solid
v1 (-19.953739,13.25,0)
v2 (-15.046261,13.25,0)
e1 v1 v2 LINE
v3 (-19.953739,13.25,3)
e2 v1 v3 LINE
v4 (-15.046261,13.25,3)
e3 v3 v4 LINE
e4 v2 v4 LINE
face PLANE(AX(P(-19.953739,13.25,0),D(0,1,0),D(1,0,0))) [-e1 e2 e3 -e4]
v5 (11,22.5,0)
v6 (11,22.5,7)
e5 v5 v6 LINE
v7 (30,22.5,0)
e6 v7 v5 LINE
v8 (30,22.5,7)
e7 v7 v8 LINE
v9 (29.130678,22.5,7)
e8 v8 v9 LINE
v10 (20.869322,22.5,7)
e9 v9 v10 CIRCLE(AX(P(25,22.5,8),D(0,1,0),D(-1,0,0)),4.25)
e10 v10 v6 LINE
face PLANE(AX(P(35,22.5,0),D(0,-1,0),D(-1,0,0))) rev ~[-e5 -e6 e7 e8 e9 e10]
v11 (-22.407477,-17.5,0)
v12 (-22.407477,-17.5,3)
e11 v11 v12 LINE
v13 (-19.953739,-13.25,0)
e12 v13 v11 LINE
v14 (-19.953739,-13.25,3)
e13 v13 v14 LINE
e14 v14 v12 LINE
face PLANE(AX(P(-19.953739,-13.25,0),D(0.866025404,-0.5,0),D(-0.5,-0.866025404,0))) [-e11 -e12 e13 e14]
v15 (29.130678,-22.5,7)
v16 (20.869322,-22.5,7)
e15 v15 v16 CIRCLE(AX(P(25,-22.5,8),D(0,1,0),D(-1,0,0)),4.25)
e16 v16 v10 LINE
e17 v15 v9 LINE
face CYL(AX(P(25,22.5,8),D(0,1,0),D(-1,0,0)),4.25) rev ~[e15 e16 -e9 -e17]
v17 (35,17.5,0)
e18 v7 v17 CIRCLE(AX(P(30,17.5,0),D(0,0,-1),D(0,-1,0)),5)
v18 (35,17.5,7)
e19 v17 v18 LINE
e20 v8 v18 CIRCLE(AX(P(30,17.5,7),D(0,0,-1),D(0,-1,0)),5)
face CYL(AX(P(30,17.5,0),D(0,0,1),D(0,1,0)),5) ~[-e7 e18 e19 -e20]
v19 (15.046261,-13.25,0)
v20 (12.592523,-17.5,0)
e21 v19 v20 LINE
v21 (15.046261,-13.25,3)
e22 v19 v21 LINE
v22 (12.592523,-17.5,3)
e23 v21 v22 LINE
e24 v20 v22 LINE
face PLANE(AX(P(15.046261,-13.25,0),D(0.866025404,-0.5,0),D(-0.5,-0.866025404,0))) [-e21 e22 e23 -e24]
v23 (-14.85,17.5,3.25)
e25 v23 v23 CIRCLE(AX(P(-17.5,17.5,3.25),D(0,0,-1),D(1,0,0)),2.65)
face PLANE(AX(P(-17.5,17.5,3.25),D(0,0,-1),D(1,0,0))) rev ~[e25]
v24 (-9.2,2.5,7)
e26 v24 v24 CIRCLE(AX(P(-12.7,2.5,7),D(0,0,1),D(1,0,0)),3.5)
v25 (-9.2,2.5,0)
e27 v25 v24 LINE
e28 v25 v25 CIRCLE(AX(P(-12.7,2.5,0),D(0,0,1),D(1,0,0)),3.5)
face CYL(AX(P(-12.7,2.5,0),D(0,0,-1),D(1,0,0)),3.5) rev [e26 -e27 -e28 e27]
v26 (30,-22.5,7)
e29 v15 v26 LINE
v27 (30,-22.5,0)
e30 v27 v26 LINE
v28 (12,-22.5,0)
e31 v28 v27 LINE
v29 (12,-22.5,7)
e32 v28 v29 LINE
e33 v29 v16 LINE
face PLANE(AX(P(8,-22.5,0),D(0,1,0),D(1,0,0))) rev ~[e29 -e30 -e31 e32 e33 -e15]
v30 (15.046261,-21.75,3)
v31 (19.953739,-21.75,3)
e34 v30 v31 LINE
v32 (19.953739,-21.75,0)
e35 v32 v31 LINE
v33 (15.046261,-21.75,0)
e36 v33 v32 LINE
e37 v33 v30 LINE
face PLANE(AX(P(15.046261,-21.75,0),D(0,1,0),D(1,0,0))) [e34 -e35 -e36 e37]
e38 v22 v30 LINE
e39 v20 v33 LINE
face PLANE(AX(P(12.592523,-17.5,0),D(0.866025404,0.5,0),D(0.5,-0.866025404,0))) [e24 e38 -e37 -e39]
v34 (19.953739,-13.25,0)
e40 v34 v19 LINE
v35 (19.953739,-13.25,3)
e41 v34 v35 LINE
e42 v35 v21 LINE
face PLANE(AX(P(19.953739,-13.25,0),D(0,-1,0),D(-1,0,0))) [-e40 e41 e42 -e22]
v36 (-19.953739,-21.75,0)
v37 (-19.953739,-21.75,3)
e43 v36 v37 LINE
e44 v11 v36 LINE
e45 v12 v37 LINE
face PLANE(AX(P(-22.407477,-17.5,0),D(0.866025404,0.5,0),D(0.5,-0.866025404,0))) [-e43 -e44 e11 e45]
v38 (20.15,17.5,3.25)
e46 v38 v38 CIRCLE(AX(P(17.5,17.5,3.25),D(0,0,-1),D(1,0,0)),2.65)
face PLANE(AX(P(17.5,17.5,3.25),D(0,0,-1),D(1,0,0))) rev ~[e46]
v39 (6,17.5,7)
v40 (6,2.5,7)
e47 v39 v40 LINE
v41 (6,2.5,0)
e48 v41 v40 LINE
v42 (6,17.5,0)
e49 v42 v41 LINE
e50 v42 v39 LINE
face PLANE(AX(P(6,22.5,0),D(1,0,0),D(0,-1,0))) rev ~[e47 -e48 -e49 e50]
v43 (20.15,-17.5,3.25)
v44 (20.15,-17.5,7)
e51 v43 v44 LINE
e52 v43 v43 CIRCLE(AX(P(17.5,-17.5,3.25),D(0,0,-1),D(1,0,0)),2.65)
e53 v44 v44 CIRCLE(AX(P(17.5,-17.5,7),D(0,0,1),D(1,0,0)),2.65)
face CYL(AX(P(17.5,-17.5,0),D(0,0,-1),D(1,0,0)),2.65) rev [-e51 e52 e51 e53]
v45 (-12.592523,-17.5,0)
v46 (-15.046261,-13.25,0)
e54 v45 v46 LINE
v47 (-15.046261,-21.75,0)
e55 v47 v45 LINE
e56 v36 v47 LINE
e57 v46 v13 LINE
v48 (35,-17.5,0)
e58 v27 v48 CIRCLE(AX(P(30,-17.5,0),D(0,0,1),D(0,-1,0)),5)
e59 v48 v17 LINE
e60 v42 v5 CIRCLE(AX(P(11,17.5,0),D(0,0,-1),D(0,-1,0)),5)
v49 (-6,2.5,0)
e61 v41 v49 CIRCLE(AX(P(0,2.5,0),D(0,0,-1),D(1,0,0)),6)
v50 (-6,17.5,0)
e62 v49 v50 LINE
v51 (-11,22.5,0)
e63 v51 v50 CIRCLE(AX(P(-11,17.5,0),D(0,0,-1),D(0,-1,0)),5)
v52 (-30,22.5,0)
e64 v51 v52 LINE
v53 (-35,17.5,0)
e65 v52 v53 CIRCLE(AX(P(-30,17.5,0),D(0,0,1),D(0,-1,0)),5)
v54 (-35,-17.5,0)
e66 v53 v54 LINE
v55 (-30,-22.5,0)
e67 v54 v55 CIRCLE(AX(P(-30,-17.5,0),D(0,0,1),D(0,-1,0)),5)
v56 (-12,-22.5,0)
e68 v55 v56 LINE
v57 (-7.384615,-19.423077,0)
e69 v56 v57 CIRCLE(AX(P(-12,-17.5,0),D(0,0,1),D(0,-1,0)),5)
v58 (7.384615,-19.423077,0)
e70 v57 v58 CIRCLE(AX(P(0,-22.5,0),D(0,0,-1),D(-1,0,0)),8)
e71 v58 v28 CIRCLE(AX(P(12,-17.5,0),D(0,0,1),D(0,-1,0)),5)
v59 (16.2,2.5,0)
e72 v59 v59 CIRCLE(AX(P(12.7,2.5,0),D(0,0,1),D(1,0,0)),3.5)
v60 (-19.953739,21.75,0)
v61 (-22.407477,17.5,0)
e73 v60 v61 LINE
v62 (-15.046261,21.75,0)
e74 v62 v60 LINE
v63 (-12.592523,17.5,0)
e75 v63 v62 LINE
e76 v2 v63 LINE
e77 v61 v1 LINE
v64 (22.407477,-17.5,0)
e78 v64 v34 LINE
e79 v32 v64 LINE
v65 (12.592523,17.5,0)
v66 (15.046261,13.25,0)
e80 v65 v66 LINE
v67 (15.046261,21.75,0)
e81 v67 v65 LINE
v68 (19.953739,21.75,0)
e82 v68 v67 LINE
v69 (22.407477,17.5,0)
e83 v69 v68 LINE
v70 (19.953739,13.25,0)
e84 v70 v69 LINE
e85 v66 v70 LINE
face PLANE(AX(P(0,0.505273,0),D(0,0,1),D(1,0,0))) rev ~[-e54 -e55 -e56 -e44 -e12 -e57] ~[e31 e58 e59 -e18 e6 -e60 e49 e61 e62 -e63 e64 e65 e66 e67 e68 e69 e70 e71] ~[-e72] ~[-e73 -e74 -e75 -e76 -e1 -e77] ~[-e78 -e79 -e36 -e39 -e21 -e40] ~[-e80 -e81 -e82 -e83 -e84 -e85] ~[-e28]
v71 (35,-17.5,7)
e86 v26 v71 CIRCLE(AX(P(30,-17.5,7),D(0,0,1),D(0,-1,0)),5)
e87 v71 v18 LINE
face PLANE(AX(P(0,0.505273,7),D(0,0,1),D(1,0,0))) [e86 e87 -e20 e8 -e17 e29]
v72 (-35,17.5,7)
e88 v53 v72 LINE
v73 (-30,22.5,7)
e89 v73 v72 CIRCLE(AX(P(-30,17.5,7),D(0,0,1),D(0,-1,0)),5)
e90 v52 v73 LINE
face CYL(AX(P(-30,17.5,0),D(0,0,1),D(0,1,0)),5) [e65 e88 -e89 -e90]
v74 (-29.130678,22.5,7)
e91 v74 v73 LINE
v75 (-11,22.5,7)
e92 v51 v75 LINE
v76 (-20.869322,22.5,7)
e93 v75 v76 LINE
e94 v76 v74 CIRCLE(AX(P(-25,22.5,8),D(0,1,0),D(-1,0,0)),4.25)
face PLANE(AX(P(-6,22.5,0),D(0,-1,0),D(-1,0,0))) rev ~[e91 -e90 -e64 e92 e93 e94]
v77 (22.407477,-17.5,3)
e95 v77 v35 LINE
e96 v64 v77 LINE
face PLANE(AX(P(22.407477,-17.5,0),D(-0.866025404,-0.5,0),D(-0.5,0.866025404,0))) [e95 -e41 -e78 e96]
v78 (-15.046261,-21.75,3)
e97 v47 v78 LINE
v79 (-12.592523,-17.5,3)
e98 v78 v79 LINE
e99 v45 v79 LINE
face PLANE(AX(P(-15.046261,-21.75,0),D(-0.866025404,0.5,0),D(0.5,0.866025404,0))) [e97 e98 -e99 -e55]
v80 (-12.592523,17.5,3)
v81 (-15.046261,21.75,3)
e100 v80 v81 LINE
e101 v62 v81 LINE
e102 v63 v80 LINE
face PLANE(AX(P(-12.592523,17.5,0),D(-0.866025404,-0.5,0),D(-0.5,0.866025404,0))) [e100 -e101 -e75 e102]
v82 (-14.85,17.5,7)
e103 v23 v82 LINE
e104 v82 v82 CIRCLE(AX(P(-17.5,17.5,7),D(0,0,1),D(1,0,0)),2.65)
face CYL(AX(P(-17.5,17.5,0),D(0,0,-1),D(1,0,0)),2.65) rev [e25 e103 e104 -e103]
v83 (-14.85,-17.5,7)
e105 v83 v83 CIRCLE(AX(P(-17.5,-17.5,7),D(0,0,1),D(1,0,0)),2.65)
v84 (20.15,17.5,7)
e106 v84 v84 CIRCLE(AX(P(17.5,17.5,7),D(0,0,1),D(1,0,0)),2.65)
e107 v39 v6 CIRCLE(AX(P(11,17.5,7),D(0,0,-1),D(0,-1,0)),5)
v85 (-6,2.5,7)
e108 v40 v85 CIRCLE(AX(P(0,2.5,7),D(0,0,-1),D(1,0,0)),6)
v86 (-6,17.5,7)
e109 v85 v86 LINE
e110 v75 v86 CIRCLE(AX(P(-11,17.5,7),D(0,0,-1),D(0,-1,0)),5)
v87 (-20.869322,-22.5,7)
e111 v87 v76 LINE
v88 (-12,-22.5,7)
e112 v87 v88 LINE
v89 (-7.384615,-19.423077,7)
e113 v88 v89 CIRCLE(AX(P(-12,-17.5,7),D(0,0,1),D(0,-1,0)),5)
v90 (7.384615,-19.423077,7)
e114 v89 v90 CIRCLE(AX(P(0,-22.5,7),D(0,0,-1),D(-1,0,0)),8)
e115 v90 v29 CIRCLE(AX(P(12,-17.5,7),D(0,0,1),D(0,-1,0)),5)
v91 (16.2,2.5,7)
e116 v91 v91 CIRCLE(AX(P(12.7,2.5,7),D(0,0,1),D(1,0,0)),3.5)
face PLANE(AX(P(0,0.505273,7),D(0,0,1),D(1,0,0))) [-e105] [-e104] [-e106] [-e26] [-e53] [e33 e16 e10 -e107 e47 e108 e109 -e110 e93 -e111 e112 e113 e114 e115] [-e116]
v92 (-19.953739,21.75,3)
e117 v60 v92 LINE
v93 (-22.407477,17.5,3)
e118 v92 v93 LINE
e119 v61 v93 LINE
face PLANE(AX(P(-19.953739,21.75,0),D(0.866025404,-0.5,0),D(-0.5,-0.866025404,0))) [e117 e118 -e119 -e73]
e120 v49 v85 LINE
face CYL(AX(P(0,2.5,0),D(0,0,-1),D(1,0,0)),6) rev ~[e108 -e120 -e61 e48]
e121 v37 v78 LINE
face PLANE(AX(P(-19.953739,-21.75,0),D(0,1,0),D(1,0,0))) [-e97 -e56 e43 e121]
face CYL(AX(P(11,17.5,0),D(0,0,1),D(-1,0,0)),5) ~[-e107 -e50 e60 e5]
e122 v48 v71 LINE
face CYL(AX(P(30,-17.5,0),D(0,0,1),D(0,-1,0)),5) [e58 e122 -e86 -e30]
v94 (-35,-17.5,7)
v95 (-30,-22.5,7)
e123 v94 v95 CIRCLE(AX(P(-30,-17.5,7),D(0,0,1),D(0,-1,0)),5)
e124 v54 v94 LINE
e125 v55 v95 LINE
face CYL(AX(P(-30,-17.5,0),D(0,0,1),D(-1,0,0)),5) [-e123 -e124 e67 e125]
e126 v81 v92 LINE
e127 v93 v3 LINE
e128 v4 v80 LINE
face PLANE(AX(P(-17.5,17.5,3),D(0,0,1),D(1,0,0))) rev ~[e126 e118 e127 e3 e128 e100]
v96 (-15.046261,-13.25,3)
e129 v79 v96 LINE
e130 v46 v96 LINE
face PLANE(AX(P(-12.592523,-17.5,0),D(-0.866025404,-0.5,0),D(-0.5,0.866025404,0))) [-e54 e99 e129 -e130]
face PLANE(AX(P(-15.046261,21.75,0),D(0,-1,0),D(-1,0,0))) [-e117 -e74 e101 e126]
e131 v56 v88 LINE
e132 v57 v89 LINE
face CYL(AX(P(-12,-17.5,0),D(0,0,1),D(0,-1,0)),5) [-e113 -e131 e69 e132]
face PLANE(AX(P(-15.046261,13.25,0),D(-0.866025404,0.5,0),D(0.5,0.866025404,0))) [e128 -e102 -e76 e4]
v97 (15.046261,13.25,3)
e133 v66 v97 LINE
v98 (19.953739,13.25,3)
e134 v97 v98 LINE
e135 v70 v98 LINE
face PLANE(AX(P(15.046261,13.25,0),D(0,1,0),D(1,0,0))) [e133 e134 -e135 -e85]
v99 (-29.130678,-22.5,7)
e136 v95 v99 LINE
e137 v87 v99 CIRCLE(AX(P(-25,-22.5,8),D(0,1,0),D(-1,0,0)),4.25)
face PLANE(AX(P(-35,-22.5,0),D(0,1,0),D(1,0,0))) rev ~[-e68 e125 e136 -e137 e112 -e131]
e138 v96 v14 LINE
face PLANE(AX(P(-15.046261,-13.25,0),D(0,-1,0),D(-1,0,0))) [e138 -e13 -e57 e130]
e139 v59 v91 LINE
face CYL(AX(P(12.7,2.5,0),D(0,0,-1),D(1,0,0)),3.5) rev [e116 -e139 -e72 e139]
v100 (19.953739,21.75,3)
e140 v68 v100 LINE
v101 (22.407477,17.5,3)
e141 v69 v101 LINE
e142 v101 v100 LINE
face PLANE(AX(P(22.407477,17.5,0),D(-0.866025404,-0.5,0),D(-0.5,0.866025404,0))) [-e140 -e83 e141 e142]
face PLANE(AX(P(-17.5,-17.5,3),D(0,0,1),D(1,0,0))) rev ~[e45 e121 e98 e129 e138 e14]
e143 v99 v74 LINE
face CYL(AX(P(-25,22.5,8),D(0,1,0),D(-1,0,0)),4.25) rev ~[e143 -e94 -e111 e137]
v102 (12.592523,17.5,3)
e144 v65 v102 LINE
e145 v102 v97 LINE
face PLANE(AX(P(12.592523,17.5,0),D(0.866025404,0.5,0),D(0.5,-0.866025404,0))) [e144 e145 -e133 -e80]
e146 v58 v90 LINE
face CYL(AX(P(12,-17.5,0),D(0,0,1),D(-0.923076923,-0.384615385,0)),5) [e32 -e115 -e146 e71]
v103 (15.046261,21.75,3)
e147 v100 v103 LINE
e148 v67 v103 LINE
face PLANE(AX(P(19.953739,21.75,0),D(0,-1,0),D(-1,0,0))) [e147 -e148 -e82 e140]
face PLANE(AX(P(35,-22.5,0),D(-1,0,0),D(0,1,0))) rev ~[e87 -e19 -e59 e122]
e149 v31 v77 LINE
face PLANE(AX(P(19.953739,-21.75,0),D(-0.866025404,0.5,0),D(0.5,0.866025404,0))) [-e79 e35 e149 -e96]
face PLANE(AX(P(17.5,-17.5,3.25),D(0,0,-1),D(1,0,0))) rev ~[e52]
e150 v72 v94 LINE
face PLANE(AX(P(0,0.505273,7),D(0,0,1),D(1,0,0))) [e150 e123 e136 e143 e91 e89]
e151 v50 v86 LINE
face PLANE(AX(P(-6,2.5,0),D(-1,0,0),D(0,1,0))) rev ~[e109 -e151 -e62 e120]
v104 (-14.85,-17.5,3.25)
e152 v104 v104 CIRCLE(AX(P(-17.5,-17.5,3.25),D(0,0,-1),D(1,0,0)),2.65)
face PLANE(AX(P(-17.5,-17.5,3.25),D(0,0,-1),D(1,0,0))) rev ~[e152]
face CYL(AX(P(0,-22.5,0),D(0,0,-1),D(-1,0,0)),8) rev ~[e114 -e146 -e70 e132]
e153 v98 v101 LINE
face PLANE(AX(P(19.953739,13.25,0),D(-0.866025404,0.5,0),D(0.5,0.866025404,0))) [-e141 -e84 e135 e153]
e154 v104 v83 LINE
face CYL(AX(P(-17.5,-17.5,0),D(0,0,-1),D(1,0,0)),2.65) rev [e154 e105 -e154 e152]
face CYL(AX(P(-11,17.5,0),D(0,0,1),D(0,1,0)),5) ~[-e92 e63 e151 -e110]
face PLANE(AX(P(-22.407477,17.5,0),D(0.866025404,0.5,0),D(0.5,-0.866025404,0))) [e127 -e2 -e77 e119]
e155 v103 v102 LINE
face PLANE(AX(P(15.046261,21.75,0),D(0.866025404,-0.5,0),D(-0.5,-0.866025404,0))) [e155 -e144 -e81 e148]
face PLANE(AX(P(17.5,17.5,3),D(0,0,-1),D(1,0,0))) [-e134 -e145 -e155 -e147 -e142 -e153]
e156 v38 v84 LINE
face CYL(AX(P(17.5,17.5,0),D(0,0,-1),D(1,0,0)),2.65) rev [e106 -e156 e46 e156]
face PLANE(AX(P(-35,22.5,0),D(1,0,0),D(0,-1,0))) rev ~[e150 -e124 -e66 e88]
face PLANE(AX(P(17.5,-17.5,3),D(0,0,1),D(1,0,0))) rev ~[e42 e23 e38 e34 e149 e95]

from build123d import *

# Parameters (mm, degrees)
F0_R     = 3.5
F0_R_2   = 2.65
F1_DEPTH = 7
F2_DEPTH = 3
F3_R     = 4.25
F4_DEPTH = 45.001
F5_R     = 5
F7_R     = 2.65
F8_DEPTH = 0.25


with BuildPart() as f1:
    # F0 (on Top) → F1 (new body)
    with BuildSketch(Plane.XY):
        with BuildLine():
            Line((-6, 22.5), (-35, 22.5))
            Line((-35, 22.5), (-35, -22.5))
            Line((-35, -22.5), (-8, -22.5))
            ThreePointArc((-8, -22.5), (0, -14.5), (8, -22.5))
            Line((8, -22.5), (35, -22.5))
            Line((35, -22.5), (35, 22.5))
            Line((35, 22.5), (6, 22.5))
            Line((6, 22.5), (6, 2.5))
            ThreePointArc((6, 2.5), (0, -3.5), (-6, 2.5))
            Line((-6, 2.5), (-6, 22.5))
        make_face()
        Polygon((-22.4074772881, -17.5), (-19.9537386441, -13.25), (-15.0462613559, -13.25), (-12.5925227119, -17.5), (-15.0462613559, -21.75), (-19.9537386441, -21.75), align=None, mode=Mode.SUBTRACT)
        Polygon((12.5925227119, -17.5), (15.0462613559, -13.25), (19.9537386441, -13.25), (22.4074772881, -17.5), (19.9537386441, -21.75), (15.0462613559, -21.75), align=None, mode=Mode.SUBTRACT)
        with Locations((-12.7, 2.5)):
            Circle(F0_R, mode=Mode.SUBTRACT)
        Polygon((-12.5925227119, 17.5), (-15.0462613559, 13.25), (-19.9537386441, 13.25), (-22.4074772881, 17.5), (-19.9537386441, 21.75), (-15.0462613559, 21.75), align=None, mode=Mode.SUBTRACT)
        with Locations((12.7, 2.5)):
            Circle(F0_R, mode=Mode.SUBTRACT)
        Polygon((22.4074772881, 17.5), (19.9537386441, 13.25), (15.0462613559, 13.25), (12.5925227119, 17.5), (15.0462613559, 21.75), (19.9537386441, 21.75), align=None, mode=Mode.SUBTRACT)
        Polygon((-19.9537386441, 13.25), (-15.0462613559, 13.25), (-12.5925227119, 17.5), (-15.0462613559, 21.75), (-19.9537386441, 21.75), (-22.4074772881, 17.5), align=None)
        with Locations((-17.5, 17.5)):
            Circle(F0_R_2, mode=Mode.SUBTRACT)
        Polygon((-15.0462613559, -13.25), (-19.9537386441, -13.25), (-22.4074772881, -17.5), (-19.9537386441, -21.75), (-15.0462613559, -21.75), (-12.5925227119, -17.5), align=None)
        with Locations((-17.5, -17.5)):
            Circle(F0_R_2, mode=Mode.SUBTRACT)
        Polygon((19.9537386441, -13.25), (15.0462613559, -13.25), (12.5925227119, -17.5), (15.0462613559, -21.75), (19.9537386441, -21.75), (22.4074772881, -17.5), align=None)
        with Locations((17.5, -17.5)):
            Circle(F0_R_2, mode=Mode.SUBTRACT)
        Polygon((15.0462613559, 13.25), (19.9537386441, 13.25), (22.4074772881, 17.5), (19.9537386441, 21.75), (15.0462613559, 21.75), (12.5925227119, 17.5), align=None)
        with Locations((17.5, 17.5)):
            Circle(F0_R_2, mode=Mode.SUBTRACT)
    extrude(amount=F1_DEPTH)

    # F0 (on Top) → F2 (cut)
    with BuildSketch(Plane.XY):
        Polygon((19.9537386441, -13.25), (15.0462613559, -13.25), (12.5925227119, -17.5), (15.0462613559, -21.75), (19.9537386441, -21.75), (22.4074772881, -17.5), align=None)
        with Locations((17.5, -17.5)):
            Circle(F0_R_2, mode=Mode.SUBTRACT)
        Polygon((15.0462613559, 13.25), (19.9537386441, 13.25), (22.4074772881, 17.5), (19.9537386441, 21.75), (15.0462613559, 21.75), (12.5925227119, 17.5), align=None)
        with Locations((17.5, 17.5)):
            Circle(F0_R_2, mode=Mode.SUBTRACT)
        Polygon((-19.9537386441, 13.25), (-15.0462613559, 13.25), (-12.5925227119, 17.5), (-15.0462613559, 21.75), (-19.9537386441, 21.75), (-22.4074772881, 17.5), align=None)
        with Locations((-17.5, 17.5)):
            Circle(F0_R_2, mode=Mode.SUBTRACT)
        Polygon((-15.0462613559, -13.25), (-19.9537386441, -13.25), (-22.4074772881, -17.5), (-19.9537386441, -21.75), (-15.0462613559, -21.75), (-12.5925227119, -17.5), align=None)
        with Locations((-17.5, -17.5)):
            Circle(F0_R_2, mode=Mode.SUBTRACT)
    extrude(amount=F2_DEPTH, mode=Mode.SUBTRACT)

    # F3 (on face) → F4 (cut, through all)
    with BuildSketch(Plane(origin=(0, 22.5, 0), x_dir=(-1, 0, 0), z_dir=(0, 1, 0))):
        with Locations((-25, 8)):
            Circle(F3_R)
        with Locations((25, 8)):
            Circle(F3_R)
    extrude(amount=-F4_DEPTH, mode=Mode.SUBTRACT)

    # F5
    f5_edges = [f1.edges().sort_by_distance(p)[0] for p in [
        (35, 22.5, 3.5),
        (6, 22.5, 3.5),
        (-6, 22.5, 3.5),
        (-35, 22.5, 3.5),
        (-35, -22.5, 3.5),
        (35, -22.5, 3.5),
        (-8, -22.5, 3.5),
        (8, -22.5, 3.5),
    ]]
    fillet(f5_edges, radius=F5_R)

    # F7 (on offset) → F8 (join)
    with BuildSketch(Plane(origin=(0, 0, 3), x_dir=(1, 0, 0), z_dir=(0, 0, -1))):
        with Locations((17.5, -17.5)):
            Circle(F7_R)
        with Locations((17.5, 17.5)):
            Circle(F7_R)
        with Locations((-17.5, 17.5)):
            Circle(F7_R)
        with Locations((-17.5, -17.5)):
            Circle(F7_R)
    extrude(amount=-F8_DEPTH)


solid = f1.part
